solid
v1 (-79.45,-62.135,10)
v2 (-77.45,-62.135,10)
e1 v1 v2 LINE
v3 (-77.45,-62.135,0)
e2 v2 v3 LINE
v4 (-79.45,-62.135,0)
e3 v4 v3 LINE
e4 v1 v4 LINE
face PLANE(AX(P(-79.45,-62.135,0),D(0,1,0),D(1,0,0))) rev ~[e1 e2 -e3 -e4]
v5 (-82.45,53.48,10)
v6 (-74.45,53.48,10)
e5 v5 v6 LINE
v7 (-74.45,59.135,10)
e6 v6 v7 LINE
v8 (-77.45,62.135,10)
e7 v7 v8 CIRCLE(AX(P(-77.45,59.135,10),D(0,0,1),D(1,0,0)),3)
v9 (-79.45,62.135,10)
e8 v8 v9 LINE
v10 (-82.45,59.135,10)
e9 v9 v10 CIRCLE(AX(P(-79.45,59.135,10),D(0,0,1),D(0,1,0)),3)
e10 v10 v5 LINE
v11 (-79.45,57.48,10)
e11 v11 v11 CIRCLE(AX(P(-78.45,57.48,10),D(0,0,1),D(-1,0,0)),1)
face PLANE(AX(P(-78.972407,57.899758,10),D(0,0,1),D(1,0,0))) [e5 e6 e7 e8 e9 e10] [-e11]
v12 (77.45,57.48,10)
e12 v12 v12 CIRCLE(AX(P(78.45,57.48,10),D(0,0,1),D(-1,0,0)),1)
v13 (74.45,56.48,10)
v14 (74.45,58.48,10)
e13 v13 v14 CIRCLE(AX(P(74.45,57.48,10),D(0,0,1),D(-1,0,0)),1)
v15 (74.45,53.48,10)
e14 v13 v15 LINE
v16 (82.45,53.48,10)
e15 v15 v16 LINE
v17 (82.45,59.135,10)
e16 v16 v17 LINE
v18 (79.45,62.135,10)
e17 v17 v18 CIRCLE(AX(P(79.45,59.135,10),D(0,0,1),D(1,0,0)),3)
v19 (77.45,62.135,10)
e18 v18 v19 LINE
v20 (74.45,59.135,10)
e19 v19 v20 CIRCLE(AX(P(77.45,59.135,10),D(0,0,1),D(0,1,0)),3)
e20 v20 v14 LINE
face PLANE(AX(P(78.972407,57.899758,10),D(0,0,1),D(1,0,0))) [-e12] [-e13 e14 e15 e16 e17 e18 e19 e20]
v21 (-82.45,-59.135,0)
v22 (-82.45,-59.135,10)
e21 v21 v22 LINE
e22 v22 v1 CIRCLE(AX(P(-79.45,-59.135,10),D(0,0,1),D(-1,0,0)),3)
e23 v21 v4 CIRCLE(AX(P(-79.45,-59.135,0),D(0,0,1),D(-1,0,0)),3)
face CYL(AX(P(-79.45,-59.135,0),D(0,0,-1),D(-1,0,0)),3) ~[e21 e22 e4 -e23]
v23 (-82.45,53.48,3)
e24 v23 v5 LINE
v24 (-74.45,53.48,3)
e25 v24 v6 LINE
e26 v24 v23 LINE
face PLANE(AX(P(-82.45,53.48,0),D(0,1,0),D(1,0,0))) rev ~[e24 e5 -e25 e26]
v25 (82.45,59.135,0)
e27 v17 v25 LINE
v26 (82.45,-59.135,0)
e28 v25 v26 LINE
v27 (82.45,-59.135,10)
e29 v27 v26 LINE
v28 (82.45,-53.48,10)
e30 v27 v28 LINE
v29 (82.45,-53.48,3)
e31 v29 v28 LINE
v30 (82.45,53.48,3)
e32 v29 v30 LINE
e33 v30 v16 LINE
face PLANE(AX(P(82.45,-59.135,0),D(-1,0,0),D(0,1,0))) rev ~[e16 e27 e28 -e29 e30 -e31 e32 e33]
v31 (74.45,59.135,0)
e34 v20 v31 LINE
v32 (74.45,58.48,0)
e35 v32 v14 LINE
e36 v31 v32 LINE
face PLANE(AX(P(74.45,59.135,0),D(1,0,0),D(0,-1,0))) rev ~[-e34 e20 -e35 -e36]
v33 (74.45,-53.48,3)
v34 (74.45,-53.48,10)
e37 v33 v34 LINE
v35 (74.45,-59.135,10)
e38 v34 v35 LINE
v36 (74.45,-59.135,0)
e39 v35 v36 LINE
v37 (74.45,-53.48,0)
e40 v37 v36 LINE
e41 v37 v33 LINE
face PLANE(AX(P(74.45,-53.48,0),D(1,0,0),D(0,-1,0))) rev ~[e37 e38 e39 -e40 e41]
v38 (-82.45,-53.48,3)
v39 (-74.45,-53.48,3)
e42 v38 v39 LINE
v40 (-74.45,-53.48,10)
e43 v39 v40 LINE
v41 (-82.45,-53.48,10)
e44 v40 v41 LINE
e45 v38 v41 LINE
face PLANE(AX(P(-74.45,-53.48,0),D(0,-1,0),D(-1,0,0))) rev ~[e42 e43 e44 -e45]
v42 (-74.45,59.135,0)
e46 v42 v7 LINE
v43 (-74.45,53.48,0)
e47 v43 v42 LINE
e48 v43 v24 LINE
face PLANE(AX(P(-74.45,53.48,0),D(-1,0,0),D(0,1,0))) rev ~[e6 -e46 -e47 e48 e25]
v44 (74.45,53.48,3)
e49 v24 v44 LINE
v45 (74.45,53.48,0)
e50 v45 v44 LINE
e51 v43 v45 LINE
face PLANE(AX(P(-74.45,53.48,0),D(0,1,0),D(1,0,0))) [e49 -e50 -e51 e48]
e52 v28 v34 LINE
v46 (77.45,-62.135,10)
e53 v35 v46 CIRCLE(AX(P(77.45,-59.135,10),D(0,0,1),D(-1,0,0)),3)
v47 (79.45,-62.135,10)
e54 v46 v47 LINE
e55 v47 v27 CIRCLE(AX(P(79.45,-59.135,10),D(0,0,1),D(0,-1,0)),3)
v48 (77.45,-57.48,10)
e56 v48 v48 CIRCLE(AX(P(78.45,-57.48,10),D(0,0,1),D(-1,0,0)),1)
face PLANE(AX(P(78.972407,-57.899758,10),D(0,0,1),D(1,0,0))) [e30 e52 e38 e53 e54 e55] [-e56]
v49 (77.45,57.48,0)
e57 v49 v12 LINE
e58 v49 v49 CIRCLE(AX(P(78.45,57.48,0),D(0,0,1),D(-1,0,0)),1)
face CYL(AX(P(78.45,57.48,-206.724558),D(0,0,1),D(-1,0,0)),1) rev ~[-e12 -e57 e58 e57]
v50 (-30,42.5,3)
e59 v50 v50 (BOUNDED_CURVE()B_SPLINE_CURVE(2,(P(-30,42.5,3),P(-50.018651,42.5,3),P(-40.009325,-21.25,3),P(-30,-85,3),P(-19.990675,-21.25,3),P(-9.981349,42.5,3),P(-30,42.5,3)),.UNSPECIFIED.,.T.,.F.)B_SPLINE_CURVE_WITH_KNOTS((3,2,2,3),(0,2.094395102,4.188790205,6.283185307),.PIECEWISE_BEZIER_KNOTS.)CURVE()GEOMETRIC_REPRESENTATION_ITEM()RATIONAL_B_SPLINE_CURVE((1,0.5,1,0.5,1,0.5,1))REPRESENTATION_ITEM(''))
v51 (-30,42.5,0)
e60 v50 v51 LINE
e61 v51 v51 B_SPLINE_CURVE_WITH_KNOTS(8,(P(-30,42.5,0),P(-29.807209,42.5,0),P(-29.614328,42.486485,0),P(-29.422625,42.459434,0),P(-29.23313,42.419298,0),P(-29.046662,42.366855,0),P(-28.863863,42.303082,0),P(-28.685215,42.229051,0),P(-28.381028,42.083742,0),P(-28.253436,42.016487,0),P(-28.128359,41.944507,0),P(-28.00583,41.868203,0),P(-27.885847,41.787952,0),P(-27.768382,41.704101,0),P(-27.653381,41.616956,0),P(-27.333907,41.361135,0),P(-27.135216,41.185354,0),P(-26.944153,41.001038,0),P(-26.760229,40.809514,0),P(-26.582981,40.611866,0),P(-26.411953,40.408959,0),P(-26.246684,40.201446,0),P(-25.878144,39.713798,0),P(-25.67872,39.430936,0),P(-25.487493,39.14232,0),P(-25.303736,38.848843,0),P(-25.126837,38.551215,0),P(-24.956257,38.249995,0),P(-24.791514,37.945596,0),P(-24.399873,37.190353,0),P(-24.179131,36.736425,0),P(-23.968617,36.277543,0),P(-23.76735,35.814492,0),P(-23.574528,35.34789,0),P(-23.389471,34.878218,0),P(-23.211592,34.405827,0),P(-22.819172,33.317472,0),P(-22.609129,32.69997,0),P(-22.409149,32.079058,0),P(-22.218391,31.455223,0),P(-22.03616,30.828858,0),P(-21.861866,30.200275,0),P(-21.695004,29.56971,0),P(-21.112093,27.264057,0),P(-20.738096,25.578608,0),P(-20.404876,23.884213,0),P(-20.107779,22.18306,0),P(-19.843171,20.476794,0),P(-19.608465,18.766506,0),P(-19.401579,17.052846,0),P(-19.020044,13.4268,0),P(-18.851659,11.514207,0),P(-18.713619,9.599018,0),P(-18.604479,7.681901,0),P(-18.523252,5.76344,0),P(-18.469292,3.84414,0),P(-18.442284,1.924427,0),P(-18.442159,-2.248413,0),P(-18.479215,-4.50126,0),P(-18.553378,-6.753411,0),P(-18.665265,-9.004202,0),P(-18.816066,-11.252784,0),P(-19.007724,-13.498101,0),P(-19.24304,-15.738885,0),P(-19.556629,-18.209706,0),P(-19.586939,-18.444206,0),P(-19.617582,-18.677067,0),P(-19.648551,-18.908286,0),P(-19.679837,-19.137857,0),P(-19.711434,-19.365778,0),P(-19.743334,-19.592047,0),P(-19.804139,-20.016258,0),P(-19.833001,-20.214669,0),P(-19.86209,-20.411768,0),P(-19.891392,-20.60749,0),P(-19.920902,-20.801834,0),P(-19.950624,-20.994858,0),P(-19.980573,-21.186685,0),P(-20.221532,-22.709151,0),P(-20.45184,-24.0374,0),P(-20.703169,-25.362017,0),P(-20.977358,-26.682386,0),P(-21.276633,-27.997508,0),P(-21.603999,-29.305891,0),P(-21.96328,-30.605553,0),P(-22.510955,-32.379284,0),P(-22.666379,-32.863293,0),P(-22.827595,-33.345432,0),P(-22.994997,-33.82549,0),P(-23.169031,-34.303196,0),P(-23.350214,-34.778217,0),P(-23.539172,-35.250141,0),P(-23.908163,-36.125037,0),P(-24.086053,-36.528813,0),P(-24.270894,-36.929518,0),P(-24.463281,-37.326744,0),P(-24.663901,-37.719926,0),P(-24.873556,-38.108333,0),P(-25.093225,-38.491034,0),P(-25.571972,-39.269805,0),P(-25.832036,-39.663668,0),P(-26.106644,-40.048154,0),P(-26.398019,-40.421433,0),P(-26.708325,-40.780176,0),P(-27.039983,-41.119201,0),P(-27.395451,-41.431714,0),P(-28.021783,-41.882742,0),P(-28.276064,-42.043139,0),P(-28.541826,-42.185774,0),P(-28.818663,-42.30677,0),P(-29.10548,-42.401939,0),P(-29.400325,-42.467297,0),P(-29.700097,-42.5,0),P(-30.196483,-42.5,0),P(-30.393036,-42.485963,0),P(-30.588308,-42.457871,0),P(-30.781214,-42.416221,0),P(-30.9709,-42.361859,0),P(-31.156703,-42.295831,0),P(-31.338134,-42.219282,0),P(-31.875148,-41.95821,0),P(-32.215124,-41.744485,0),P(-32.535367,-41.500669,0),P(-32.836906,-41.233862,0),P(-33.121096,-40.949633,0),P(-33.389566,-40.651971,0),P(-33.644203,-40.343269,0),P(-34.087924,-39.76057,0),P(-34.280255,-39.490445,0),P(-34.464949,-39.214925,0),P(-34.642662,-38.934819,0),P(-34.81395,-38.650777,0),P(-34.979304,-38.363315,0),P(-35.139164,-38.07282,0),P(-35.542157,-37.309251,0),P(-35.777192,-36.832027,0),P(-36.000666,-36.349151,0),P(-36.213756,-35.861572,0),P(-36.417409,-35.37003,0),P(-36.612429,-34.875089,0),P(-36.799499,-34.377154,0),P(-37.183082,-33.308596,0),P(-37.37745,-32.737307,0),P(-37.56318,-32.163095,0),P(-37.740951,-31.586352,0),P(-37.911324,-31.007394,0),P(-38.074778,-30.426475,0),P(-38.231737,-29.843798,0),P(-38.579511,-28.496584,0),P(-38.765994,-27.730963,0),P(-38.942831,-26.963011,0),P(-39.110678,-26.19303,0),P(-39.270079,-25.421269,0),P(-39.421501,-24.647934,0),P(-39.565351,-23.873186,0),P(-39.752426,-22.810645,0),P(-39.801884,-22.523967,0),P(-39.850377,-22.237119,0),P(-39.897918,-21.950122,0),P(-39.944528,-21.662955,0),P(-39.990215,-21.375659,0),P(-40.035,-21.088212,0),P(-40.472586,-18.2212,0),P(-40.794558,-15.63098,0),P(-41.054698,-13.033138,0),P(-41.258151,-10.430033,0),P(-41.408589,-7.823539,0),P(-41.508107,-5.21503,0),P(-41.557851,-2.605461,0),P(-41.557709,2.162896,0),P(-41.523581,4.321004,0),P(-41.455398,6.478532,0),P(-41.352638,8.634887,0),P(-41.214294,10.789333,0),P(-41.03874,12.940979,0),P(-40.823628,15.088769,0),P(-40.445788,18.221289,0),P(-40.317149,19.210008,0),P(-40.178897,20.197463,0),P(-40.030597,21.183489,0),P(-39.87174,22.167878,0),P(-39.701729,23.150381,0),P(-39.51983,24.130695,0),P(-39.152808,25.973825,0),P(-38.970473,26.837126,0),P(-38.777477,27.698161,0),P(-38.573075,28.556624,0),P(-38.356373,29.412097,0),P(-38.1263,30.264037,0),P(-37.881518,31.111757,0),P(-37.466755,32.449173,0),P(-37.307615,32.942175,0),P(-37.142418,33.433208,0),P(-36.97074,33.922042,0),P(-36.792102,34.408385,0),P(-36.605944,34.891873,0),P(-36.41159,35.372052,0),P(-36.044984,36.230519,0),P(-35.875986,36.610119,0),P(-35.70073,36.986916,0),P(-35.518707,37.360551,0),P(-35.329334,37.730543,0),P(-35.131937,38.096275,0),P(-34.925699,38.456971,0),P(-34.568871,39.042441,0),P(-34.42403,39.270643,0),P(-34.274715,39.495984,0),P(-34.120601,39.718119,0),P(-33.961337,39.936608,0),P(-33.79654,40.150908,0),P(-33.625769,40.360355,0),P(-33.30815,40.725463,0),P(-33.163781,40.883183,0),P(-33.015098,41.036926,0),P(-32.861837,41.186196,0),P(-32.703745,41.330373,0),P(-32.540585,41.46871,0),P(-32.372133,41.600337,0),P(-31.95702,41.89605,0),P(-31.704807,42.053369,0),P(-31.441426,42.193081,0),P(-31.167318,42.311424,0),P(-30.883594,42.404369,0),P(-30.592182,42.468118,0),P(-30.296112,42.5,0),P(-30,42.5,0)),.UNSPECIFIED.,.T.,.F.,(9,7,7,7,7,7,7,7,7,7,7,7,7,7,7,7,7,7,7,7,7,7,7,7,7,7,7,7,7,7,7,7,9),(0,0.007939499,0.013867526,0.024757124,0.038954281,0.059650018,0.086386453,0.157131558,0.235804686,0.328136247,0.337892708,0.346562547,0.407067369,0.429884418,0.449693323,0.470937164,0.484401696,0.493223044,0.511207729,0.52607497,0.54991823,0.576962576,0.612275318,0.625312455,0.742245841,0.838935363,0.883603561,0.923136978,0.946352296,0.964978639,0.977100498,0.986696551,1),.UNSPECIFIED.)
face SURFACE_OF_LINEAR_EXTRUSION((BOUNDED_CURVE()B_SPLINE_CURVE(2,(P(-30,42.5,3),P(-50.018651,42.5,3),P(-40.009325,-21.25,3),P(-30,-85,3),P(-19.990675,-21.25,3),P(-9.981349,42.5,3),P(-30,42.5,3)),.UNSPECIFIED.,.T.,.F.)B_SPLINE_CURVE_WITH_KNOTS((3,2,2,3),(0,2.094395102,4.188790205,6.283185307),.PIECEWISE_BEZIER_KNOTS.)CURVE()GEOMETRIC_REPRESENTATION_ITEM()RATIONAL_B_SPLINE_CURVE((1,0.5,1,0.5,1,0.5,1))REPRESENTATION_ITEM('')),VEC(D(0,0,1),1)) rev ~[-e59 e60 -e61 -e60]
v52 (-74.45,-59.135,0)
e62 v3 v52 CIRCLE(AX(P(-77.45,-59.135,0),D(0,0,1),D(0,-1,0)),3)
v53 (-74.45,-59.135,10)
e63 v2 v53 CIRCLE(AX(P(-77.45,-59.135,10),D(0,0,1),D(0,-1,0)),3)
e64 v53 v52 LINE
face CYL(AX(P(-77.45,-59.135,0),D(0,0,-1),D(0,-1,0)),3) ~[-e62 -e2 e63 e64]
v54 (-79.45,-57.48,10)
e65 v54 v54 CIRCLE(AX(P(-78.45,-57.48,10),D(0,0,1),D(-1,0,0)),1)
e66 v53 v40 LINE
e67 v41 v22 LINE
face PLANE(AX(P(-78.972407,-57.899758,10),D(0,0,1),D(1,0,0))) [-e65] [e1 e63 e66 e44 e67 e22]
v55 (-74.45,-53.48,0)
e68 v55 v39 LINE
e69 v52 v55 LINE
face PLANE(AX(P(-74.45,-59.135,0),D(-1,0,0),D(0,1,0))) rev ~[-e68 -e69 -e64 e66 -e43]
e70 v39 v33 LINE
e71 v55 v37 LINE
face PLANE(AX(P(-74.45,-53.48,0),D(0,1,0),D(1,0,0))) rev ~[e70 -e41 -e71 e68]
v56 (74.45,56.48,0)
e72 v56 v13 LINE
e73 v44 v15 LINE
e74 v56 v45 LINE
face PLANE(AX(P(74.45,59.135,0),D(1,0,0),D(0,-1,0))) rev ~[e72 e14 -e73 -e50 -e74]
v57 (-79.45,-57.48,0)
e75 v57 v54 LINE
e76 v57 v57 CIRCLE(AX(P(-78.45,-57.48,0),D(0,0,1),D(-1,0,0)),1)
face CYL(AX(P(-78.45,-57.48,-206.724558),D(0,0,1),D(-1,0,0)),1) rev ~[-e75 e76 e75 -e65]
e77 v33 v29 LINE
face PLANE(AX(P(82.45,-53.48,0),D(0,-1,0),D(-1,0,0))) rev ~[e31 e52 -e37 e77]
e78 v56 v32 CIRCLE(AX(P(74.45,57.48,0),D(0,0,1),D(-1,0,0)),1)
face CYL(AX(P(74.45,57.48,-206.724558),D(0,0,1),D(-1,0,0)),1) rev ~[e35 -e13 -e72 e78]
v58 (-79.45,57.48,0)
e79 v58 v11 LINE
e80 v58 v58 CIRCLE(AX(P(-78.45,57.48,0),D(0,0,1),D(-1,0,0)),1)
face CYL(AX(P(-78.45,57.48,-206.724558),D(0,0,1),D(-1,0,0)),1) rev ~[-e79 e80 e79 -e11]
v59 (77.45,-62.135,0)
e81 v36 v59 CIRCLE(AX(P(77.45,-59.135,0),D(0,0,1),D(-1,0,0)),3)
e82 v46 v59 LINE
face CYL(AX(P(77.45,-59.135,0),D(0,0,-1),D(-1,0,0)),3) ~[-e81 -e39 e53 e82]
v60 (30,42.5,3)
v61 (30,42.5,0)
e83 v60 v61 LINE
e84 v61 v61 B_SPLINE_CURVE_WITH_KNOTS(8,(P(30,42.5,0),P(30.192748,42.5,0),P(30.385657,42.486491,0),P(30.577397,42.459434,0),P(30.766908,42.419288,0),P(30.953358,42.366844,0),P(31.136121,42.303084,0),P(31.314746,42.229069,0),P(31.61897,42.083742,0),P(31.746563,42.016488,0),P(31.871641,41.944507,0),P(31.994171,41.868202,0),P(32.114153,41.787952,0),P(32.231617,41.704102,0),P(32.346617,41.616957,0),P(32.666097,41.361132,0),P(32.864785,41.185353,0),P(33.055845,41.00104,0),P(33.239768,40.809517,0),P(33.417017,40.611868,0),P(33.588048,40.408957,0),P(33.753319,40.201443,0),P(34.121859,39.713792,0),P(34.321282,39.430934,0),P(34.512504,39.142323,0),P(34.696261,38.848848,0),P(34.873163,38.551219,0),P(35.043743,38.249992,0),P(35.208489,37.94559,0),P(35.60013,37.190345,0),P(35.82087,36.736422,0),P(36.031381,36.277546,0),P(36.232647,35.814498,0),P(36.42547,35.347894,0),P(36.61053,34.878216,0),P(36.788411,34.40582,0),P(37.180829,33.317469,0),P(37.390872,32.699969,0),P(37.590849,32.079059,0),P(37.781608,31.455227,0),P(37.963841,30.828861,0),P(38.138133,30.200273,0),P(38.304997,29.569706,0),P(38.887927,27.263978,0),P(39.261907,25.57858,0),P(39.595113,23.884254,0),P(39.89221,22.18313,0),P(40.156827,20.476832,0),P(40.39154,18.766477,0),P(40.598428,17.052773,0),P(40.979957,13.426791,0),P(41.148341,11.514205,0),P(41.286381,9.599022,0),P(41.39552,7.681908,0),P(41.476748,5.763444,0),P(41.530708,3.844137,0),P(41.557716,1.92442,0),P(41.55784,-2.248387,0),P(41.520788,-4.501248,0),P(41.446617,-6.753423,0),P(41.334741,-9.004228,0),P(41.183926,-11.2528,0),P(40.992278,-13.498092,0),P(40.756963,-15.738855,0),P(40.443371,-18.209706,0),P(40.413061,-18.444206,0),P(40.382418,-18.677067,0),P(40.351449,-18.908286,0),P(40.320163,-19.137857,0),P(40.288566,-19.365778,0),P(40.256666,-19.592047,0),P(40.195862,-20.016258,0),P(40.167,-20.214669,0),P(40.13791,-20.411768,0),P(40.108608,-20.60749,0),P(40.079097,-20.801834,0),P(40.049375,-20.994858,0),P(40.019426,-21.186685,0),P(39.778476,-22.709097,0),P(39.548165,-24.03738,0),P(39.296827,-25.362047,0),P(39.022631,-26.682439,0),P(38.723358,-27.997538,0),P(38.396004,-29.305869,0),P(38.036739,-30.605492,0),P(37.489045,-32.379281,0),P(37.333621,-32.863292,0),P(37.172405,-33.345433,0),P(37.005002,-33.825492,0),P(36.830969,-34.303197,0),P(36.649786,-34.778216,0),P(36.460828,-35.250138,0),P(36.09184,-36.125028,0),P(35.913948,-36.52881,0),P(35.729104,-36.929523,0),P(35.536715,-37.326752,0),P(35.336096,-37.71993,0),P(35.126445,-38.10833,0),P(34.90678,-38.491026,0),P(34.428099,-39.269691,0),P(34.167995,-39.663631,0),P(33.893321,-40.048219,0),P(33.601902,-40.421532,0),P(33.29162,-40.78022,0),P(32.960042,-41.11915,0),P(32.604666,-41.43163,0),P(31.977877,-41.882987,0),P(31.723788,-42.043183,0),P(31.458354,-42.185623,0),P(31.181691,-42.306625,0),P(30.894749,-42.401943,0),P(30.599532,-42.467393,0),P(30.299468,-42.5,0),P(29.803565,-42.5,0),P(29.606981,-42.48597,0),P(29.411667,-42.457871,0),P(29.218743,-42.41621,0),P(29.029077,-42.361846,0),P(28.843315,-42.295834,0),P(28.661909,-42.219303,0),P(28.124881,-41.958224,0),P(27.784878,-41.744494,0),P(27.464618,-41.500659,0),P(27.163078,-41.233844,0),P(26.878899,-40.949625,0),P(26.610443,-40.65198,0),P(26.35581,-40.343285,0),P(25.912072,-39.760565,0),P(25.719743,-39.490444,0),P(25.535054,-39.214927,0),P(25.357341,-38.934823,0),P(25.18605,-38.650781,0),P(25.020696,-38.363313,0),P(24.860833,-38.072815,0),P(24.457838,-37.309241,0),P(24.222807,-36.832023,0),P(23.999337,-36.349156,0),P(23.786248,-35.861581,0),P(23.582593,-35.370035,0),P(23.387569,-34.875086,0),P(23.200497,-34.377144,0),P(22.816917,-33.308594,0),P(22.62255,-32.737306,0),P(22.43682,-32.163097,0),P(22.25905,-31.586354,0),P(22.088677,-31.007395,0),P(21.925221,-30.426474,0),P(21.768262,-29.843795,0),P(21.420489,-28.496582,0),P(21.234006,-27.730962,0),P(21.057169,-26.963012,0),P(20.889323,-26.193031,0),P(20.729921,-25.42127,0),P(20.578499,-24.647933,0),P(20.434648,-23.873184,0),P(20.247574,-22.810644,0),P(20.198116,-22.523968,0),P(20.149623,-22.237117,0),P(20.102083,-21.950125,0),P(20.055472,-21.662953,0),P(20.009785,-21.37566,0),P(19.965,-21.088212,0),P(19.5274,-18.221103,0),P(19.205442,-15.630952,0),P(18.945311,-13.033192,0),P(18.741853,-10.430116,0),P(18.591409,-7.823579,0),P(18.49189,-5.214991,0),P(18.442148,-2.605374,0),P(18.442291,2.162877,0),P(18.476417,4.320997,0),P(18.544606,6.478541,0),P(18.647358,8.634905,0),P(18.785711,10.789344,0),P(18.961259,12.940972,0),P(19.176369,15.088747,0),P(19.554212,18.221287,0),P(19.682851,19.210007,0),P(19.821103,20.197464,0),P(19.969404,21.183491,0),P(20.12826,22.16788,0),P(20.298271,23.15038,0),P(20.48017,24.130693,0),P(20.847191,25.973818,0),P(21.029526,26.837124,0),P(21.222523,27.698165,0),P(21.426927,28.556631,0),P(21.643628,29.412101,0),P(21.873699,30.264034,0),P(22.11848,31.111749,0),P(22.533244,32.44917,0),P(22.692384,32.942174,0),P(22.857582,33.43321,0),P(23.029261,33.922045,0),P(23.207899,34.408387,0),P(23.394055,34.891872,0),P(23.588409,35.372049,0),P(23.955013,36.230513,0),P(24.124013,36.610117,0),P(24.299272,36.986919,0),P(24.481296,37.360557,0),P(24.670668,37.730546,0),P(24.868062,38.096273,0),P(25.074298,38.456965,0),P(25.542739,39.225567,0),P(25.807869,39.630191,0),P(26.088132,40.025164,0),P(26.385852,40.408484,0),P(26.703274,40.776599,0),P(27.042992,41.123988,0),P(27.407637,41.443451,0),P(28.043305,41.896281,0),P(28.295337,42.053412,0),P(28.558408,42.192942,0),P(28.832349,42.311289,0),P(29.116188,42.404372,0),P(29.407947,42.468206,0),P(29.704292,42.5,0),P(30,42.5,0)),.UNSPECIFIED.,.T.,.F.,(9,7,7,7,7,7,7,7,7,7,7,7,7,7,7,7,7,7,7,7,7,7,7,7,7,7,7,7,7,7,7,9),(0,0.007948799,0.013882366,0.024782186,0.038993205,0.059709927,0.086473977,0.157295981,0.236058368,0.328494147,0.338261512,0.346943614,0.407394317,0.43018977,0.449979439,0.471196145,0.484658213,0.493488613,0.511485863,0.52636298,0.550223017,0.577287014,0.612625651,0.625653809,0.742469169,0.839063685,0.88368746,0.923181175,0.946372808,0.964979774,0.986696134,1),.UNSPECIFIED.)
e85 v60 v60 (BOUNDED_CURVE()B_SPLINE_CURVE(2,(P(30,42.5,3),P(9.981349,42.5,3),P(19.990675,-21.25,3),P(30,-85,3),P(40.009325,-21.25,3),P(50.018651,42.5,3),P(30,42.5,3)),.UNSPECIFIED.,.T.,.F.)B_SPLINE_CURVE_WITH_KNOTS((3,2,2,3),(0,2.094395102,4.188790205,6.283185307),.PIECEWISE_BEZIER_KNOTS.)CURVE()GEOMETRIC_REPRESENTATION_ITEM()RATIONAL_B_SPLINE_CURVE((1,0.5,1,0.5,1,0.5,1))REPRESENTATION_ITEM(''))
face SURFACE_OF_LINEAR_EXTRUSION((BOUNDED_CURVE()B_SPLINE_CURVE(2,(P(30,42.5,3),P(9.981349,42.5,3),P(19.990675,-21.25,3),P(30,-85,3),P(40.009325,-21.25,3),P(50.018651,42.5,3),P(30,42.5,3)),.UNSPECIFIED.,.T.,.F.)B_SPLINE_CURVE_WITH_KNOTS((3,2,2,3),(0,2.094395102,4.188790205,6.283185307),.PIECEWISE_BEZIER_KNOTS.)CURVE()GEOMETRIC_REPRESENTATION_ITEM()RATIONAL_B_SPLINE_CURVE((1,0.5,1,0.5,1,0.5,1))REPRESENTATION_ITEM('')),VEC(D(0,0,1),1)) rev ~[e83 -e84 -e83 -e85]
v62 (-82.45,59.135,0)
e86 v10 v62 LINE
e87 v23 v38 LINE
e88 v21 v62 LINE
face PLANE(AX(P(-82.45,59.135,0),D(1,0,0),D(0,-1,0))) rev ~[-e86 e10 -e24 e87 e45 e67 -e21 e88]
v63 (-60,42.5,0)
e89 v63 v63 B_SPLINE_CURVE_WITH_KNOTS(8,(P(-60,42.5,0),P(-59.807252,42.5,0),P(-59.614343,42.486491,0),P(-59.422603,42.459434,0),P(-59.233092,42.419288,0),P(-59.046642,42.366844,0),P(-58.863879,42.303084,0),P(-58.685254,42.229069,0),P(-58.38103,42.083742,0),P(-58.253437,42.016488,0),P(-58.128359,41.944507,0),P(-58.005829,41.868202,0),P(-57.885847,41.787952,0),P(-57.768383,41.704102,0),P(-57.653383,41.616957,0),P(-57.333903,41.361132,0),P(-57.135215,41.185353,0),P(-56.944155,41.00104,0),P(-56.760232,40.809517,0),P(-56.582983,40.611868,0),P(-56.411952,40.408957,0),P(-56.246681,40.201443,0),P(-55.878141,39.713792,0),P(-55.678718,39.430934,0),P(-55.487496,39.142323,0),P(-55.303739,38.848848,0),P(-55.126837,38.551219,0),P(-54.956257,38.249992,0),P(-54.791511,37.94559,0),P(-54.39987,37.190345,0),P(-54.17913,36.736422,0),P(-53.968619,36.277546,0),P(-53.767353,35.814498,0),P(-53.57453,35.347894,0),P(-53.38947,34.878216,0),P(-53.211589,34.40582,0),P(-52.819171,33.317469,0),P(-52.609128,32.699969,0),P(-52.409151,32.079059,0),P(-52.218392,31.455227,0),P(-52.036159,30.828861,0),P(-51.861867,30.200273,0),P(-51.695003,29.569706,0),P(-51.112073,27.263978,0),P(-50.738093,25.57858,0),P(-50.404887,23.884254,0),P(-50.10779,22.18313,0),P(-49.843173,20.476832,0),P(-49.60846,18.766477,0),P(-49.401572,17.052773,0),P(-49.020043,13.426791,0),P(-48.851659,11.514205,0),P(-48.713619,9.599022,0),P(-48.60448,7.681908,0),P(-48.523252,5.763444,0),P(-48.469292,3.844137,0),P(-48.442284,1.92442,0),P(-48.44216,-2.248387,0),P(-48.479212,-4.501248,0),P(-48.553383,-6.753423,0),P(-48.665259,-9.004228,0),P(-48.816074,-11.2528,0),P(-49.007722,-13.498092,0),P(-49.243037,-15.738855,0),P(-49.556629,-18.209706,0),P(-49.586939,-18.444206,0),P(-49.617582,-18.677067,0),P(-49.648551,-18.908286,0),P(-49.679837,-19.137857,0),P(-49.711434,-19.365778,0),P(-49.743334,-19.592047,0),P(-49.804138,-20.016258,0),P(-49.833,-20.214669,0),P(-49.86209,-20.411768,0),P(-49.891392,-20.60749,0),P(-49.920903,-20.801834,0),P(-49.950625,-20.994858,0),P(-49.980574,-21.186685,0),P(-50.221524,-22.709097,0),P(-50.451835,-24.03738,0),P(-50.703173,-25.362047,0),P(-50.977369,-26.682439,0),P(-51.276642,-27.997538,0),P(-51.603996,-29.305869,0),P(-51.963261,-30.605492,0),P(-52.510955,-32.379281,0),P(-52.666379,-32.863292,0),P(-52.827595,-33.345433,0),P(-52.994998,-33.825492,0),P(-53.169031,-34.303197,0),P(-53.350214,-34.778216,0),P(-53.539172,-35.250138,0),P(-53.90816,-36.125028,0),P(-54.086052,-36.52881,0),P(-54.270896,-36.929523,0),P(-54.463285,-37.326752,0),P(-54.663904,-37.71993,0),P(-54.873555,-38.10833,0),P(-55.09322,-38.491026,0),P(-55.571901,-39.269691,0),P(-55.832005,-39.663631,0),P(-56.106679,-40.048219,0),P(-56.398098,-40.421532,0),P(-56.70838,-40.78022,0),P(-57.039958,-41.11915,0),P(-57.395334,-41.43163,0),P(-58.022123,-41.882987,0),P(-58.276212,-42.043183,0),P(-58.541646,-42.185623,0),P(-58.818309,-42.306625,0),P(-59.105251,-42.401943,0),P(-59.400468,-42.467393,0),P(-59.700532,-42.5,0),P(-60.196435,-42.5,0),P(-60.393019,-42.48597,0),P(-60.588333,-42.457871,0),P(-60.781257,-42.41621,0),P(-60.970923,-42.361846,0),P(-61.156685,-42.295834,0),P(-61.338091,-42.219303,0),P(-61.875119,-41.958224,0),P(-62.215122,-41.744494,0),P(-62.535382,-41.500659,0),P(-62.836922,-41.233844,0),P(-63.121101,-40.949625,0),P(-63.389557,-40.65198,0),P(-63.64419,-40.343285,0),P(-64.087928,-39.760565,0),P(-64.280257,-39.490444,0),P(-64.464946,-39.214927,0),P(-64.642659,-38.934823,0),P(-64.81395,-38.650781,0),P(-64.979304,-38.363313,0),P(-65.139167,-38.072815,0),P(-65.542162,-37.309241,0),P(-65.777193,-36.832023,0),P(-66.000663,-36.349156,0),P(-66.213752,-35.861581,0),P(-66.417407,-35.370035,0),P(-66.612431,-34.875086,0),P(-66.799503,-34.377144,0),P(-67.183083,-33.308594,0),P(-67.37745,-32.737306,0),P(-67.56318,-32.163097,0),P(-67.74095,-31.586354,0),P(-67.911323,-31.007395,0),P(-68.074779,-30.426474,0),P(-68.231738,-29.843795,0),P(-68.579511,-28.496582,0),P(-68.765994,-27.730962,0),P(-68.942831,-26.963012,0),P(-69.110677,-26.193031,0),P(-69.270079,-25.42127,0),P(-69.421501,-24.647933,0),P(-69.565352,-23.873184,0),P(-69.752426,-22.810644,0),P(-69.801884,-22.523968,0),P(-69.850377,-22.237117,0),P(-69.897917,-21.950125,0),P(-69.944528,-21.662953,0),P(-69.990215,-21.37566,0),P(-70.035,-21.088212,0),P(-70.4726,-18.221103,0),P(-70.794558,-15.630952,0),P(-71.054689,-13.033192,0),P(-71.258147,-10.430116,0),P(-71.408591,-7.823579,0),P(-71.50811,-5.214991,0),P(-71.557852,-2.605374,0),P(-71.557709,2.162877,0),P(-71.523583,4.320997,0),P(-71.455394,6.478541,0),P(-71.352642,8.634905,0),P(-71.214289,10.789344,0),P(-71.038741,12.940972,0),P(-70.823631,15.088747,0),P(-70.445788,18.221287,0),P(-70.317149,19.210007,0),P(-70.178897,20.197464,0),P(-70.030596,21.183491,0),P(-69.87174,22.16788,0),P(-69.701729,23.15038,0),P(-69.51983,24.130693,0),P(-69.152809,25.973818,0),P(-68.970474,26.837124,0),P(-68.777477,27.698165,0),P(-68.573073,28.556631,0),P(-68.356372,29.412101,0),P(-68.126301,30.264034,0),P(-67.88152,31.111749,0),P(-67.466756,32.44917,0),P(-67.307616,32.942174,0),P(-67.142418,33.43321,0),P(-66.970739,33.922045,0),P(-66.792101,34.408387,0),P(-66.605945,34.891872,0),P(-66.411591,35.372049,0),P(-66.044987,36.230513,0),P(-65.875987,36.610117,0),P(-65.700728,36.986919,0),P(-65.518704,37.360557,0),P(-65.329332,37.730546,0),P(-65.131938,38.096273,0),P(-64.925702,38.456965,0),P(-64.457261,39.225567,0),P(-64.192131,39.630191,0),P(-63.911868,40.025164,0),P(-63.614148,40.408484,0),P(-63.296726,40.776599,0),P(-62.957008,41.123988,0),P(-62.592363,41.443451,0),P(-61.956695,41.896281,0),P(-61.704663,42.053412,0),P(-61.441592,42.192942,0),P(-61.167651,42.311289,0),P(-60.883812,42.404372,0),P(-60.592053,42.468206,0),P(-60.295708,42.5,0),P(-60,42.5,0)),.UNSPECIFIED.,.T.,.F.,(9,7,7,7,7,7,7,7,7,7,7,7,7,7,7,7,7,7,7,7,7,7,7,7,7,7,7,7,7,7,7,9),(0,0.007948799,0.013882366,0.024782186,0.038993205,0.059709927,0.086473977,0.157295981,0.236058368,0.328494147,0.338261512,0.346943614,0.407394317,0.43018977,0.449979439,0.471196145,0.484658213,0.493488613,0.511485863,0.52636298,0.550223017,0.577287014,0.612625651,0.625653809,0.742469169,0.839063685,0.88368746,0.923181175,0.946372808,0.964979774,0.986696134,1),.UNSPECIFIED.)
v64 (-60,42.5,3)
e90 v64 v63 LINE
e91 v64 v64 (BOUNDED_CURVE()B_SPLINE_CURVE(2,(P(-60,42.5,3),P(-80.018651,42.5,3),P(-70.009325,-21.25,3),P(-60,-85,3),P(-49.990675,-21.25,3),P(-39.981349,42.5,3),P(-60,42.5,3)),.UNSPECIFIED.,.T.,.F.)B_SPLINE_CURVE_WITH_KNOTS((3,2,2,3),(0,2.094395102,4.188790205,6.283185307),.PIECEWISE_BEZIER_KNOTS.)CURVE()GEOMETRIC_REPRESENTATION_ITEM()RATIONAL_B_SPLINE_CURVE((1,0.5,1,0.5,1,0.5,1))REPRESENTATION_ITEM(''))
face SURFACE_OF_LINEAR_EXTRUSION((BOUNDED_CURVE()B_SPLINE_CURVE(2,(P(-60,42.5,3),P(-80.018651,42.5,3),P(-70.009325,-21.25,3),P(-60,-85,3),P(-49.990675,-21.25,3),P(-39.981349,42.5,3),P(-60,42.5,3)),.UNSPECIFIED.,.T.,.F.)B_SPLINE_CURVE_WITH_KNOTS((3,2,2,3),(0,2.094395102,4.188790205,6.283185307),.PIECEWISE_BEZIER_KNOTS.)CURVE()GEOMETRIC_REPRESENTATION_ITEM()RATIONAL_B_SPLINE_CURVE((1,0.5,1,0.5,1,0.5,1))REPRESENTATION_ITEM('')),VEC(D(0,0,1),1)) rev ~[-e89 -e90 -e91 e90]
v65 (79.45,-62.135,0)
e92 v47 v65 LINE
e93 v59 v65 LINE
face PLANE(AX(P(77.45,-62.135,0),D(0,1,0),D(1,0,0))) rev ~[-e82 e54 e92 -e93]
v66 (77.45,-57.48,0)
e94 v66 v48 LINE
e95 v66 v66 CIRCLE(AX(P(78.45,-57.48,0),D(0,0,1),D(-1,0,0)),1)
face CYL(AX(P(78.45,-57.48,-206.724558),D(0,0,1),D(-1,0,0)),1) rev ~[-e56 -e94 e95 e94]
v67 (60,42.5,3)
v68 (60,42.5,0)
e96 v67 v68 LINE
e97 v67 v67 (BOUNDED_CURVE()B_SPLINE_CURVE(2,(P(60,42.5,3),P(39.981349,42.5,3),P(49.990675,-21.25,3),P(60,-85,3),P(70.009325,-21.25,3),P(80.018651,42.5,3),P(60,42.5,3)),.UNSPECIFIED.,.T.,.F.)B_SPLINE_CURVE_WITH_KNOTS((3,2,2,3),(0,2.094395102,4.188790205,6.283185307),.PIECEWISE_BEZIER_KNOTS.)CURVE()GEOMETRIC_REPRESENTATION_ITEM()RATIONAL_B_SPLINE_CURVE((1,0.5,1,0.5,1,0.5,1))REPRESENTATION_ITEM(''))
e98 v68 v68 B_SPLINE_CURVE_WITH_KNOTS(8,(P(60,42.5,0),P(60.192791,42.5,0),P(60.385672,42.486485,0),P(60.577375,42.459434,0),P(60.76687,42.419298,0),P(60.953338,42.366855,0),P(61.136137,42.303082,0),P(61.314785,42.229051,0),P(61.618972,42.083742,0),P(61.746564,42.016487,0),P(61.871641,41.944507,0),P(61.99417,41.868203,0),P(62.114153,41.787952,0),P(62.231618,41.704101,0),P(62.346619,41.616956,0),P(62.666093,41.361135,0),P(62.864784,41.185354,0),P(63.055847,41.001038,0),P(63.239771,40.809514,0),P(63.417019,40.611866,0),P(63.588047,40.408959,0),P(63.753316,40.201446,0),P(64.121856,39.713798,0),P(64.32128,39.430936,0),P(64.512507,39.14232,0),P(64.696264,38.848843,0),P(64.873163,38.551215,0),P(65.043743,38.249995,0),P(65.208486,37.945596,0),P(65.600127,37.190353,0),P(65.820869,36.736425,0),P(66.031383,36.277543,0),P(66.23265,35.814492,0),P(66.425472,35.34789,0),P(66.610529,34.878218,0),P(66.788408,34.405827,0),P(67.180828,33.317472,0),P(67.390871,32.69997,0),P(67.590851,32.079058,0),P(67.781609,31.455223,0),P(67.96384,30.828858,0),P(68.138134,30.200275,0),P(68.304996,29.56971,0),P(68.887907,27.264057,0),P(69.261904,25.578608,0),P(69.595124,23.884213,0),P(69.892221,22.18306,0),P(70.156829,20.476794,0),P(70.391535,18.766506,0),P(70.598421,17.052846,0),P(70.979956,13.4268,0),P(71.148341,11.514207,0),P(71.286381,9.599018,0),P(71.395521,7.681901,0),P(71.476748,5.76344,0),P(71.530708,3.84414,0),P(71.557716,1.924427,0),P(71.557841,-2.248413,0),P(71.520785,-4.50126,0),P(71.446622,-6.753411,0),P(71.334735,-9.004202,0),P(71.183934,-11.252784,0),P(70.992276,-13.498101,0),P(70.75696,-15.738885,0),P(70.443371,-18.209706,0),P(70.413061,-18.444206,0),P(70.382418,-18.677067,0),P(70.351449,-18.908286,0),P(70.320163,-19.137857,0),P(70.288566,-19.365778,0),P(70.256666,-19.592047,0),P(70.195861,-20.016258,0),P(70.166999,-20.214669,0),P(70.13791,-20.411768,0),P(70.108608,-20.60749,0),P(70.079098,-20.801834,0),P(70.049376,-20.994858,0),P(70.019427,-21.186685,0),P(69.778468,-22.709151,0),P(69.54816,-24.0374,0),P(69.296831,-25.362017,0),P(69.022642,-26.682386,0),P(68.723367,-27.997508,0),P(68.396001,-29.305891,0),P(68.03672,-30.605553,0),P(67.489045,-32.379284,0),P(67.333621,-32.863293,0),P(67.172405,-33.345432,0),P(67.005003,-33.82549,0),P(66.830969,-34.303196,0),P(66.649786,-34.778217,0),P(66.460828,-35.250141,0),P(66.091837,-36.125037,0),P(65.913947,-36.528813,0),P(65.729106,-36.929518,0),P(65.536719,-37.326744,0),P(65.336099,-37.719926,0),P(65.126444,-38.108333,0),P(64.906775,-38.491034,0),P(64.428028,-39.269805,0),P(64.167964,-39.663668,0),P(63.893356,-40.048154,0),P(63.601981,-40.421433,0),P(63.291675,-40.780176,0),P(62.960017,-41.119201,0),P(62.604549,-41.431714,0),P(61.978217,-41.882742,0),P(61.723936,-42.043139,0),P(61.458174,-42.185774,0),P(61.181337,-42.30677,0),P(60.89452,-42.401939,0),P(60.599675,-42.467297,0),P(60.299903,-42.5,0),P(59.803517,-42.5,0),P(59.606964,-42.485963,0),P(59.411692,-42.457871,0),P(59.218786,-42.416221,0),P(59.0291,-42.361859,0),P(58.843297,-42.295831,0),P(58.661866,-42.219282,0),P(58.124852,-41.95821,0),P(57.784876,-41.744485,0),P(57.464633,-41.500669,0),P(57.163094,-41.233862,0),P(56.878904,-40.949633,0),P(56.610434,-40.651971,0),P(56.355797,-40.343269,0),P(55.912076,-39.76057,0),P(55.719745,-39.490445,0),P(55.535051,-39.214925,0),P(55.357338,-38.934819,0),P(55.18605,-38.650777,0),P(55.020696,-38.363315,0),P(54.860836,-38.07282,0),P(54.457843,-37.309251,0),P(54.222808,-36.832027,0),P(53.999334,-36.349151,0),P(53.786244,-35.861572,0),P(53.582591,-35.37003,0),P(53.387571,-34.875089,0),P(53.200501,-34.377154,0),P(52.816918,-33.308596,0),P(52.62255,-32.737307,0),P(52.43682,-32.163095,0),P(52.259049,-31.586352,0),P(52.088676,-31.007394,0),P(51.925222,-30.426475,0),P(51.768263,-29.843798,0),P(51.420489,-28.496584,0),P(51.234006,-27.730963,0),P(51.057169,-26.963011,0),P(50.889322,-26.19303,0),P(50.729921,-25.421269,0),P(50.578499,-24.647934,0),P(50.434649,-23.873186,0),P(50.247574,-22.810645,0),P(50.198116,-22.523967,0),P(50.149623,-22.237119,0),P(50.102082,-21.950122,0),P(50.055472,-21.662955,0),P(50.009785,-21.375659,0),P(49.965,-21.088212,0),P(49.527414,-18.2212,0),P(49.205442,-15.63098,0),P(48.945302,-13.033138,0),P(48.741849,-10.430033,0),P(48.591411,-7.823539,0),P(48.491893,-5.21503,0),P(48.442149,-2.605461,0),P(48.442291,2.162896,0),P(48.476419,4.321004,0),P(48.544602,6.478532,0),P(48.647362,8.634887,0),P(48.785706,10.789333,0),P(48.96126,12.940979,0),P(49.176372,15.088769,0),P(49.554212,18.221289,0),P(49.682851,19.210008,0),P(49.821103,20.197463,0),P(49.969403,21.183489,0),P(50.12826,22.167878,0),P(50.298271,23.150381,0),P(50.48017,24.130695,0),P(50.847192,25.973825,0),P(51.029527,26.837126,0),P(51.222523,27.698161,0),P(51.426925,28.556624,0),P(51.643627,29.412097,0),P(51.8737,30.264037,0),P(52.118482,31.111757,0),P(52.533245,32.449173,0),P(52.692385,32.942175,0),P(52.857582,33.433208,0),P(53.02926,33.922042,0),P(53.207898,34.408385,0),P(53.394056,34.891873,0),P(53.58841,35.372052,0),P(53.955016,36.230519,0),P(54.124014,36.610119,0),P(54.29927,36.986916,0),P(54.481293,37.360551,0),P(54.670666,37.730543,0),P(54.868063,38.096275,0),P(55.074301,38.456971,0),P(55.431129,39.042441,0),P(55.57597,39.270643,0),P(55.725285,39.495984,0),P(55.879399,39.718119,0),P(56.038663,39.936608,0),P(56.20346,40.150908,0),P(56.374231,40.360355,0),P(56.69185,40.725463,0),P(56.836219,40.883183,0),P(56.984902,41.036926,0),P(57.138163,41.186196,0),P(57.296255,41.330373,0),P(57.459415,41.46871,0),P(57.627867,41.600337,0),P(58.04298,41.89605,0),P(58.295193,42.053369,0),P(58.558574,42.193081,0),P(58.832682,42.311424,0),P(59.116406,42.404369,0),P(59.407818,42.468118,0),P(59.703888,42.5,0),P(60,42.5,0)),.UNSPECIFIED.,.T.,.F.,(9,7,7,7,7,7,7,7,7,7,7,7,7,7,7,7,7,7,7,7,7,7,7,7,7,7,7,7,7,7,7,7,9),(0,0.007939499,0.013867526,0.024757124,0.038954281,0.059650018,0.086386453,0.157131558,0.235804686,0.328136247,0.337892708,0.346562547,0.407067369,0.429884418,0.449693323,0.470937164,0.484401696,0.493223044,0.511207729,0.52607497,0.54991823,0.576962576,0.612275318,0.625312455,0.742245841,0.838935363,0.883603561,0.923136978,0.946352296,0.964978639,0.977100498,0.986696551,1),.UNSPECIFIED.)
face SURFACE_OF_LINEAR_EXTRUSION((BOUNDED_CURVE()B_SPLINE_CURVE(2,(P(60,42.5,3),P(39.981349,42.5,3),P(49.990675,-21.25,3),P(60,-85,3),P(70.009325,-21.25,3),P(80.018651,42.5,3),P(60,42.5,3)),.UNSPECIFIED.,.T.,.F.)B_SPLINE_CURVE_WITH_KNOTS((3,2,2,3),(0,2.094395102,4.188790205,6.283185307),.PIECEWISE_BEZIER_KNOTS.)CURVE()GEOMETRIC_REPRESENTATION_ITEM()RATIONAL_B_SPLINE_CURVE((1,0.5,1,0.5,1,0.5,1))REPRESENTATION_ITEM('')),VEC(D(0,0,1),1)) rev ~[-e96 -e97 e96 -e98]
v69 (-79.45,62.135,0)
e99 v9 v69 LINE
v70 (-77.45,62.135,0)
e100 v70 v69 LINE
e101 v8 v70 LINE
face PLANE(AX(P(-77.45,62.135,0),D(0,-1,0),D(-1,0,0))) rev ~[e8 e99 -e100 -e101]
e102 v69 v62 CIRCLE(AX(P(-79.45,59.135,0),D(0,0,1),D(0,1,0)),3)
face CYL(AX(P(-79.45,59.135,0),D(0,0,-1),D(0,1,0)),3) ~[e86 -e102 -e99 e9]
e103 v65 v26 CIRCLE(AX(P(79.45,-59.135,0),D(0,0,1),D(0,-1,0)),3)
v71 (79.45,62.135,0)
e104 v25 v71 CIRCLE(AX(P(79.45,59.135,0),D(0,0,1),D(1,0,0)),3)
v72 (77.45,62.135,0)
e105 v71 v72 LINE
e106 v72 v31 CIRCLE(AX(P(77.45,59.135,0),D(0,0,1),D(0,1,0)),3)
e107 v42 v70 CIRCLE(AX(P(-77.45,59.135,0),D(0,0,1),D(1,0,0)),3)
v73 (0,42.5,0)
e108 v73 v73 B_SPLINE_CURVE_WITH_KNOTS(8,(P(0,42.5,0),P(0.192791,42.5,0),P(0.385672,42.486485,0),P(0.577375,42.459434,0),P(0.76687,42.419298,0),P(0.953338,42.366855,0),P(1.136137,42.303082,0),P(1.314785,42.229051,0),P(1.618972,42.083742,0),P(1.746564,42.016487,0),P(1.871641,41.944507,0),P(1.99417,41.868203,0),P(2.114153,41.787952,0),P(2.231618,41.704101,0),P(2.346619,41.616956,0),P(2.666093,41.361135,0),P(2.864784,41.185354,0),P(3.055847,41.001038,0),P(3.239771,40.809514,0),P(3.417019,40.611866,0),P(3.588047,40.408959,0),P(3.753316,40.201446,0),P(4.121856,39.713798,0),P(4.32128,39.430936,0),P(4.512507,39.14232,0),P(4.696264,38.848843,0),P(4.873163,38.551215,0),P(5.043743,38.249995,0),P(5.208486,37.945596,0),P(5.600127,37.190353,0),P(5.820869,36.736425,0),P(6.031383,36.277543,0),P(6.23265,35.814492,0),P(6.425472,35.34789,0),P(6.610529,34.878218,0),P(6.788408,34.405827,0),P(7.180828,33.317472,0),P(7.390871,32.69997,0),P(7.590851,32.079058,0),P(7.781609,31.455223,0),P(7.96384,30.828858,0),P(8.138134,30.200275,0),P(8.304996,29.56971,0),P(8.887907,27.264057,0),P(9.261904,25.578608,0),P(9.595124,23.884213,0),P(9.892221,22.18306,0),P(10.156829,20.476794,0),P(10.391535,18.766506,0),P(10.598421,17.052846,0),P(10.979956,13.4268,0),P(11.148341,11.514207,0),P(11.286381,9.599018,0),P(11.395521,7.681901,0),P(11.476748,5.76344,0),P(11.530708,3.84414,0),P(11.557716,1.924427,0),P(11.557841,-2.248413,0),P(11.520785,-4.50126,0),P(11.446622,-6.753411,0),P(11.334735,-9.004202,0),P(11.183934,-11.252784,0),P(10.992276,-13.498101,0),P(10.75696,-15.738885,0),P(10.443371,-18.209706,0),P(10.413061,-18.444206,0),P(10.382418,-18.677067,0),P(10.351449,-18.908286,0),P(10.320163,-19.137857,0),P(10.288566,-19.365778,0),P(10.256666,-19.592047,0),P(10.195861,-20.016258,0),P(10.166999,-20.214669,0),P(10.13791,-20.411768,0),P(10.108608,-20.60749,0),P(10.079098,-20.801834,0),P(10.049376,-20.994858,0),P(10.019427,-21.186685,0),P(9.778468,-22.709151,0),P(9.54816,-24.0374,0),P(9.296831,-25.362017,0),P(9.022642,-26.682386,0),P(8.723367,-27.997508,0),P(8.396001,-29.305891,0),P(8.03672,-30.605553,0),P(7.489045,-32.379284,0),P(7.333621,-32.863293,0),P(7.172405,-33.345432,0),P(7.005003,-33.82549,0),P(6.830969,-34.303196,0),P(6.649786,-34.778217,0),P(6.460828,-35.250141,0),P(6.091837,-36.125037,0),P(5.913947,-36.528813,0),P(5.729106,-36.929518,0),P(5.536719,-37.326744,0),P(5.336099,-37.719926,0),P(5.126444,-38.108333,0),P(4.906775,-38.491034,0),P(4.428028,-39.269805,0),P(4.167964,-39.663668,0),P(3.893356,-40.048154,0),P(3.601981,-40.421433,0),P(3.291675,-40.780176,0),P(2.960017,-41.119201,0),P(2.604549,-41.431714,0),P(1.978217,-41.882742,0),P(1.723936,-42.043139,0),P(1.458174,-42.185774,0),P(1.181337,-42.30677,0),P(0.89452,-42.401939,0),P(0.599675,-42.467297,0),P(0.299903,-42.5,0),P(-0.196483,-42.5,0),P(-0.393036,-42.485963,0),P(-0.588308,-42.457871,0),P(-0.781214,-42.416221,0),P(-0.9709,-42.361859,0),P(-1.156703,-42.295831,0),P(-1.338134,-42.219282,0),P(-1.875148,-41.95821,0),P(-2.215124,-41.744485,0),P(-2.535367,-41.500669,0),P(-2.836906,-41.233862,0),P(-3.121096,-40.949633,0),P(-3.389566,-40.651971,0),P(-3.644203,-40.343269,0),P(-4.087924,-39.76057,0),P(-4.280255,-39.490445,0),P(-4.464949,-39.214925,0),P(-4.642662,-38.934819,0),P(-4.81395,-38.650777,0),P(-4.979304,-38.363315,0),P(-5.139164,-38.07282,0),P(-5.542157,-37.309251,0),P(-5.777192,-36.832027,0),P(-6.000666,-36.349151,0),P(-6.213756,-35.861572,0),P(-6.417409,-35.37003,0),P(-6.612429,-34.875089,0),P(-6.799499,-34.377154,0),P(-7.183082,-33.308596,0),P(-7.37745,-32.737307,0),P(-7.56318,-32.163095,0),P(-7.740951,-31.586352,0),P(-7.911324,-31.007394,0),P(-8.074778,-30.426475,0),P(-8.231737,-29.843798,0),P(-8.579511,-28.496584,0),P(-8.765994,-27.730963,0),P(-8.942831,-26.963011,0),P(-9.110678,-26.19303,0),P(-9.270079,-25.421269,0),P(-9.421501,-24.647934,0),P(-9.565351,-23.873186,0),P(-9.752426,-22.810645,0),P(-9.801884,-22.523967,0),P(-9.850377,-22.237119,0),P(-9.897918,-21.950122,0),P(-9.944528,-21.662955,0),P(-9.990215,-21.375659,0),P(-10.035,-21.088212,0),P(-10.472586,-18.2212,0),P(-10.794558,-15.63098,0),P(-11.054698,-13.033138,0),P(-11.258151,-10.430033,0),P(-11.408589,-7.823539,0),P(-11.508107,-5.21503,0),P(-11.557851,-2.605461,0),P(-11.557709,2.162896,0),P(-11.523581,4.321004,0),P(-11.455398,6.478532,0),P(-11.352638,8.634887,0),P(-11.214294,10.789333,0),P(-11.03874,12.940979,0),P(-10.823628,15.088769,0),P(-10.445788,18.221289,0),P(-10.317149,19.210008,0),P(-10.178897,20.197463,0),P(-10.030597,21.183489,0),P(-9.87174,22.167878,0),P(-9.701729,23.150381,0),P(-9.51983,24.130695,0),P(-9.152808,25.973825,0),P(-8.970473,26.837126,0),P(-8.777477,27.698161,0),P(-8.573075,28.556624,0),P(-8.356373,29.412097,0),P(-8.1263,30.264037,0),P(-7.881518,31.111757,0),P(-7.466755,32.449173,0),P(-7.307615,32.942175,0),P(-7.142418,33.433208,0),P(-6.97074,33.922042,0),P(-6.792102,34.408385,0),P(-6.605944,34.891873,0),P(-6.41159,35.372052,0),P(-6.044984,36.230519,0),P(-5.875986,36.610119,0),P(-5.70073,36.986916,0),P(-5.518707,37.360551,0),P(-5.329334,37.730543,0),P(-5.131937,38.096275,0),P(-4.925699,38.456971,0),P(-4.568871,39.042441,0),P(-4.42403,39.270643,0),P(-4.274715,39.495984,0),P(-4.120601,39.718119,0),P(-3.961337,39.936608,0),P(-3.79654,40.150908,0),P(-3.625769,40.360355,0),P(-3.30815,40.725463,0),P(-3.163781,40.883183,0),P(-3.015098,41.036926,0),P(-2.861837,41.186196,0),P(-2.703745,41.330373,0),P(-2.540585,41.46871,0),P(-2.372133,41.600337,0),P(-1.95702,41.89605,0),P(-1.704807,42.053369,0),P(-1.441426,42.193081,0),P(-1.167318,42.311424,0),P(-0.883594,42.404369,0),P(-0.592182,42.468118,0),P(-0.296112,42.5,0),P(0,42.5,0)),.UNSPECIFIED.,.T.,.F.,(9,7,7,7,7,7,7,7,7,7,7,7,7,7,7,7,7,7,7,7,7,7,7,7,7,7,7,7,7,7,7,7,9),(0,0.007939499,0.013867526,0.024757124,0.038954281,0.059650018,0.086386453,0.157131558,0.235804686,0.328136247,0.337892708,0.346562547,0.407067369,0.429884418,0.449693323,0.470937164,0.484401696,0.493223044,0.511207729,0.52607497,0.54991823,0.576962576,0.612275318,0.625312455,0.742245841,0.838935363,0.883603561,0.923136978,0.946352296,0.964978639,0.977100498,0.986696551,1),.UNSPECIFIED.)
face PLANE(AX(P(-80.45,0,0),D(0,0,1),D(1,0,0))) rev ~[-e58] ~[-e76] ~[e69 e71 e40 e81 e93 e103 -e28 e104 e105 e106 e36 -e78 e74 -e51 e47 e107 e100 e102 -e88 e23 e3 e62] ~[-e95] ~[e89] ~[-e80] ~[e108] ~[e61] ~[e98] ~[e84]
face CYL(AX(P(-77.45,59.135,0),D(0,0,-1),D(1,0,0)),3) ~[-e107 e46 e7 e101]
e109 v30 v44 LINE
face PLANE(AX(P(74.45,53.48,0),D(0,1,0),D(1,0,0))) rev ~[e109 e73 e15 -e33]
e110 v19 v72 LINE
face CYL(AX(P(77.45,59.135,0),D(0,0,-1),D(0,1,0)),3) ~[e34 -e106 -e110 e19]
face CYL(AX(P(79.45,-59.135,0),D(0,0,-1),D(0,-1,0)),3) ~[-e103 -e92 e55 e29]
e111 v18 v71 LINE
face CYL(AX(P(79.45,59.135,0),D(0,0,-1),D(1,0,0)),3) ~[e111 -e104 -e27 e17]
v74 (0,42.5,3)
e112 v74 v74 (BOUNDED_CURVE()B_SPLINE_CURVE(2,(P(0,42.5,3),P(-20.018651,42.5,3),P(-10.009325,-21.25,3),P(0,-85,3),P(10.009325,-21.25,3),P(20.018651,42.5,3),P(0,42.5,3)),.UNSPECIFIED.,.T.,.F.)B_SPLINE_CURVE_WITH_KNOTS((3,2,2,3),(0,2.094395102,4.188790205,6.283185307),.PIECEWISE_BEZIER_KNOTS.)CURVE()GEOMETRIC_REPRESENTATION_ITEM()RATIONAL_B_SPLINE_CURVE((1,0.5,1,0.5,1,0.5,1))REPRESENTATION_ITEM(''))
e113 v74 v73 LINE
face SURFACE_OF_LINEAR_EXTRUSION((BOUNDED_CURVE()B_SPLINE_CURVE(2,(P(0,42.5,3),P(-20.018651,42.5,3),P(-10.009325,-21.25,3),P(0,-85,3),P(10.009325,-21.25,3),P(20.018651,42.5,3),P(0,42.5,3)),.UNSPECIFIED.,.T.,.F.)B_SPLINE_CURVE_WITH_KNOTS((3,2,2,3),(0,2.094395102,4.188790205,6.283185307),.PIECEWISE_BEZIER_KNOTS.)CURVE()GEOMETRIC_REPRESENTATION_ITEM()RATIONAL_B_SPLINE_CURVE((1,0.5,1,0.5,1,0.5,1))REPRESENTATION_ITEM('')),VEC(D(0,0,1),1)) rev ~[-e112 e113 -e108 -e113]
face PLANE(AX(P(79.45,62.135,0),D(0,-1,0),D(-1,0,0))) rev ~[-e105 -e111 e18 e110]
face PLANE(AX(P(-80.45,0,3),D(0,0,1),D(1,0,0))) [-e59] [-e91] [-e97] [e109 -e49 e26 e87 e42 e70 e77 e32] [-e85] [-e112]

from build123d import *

# Parameters (mm, degrees)
F0_W     = 4
F0_H     = 106.96
F0_H_2   = 4
F0_W_2   = 148.9
F1_DEPTH = 3
F2_DEPTH = 10
F3_D     = 2
F5_DEPTH = 25


# Not quite as in the source:
# - a feature names something its author has since deleted; it is built from what else it names


with BuildPart() as f1:
    # F0 (on Top) → F1 (new body)
    with BuildSketch(Plane.XY):
        with Locations((-80.45, 0)):
            Rectangle(F0_W, F0_H)
        with Locations((-76.45, 55.48)):
            Rectangle(F0_W, F0_H_2)
        Rectangle(F0_W_2, F0_H)
        with Locations((-76.45, 0)):
            Rectangle(F0_W, F0_H)
        with BuildLine():
            ThreePointArc((82.45, 59.135), (81.5713203436, 61.2563203436), (79.45, 62.135))
            Line((79.45, 62.135), (77.45, 62.135))
            ThreePointArc((77.45, 62.135), (75.3286796564, 61.2563203436), (74.45, 59.135))
            Line((74.45, 59.135), (74.45, 57.48))
            Line((74.45, 57.48), (78.45, 57.48))
            Line((78.45, 57.48), (78.45, 53.48))
            Line((78.45, 53.48), (82.45, 53.48))
            Line((82.45, 53.48), (82.45, 59.135))
        make_face()
        with Locations((76.45, 55.48)):
            Rectangle(F0_W, F0_H_2)
        with Locations((76.45, 0)):
            Rectangle(F0_W, F0_H)
        with Locations((80.45, 0)):
            Rectangle(F0_W, F0_H)
        with Locations((76.45, -55.48)):
            Rectangle(F0_W, F0_H_2)
        with BuildLine():
            Line((82.45, -59.135), (82.45, -53.48))
            Line((82.45, -53.48), (78.45, -53.48))
            Line((78.45, -53.48), (78.45, -57.48))
            Line((78.45, -57.48), (74.45, -57.48))
            Line((74.45, -57.48), (74.45, -59.135))
            ThreePointArc((74.45, -59.135), (75.3286796564, -61.2563203436), (77.45, -62.135))
            Line((77.45, -62.135), (79.45, -62.135))
            ThreePointArc((79.45, -62.135), (81.5713203436, -61.2563203436), (82.45, -59.135))
        make_face()
        with BuildLine():
            Line((-78.45, -57.48), (-78.45, -53.48))
            Line((-78.45, -53.48), (-82.45, -53.48))
            Line((-82.45, -53.48), (-82.45, -59.135))
            ThreePointArc((-82.45, -59.135), (-81.5713203436, -61.2563203436), (-79.45, -62.135))
            Line((-79.45, -62.135), (-77.45, -62.135))
            ThreePointArc((-77.45, -62.135), (-75.3286796564, -61.2563203436), (-74.45, -59.135))
            Line((-74.45, -59.135), (-74.45, -57.48))
            Line((-74.45, -57.48), (-78.45, -57.48))
        make_face()
        with Locations((-76.45, -55.48)):
            Rectangle(F0_W, F0_H_2)
        with BuildLine():
            Line((-82.45, 53.48), (-78.45, 53.48))
            Line((-78.45, 53.48), (-78.45, 57.48))
            Line((-78.45, 57.48), (-74.45, 57.48))
            Line((-74.45, 57.48), (-74.45, 59.135))
            ThreePointArc((-74.45, 59.135), (-75.3286796564, 61.2563203436), (-77.45, 62.135))
            Line((-77.45, 62.135), (-79.45, 62.135))
            ThreePointArc((-79.45, 62.135), (-81.5713203436, 61.2563203436), (-82.45, 59.135))
            Line((-82.45, 59.135), (-82.45, 53.48))
        make_face()
    extrude(amount=F1_DEPTH)

    # F0 (on Top) → F2 (join)
    with BuildSketch(Plane.XY):
        with BuildLine():
            ThreePointArc((82.45, 59.135), (81.5713203436, 61.2563203436), (79.45, 62.135))
            Line((79.45, 62.135), (77.45, 62.135))
            ThreePointArc((77.45, 62.135), (75.3286796564, 61.2563203436), (74.45, 59.135))
            Line((74.45, 59.135), (74.45, 57.48))
            Line((74.45, 57.48), (78.45, 57.48))
            Line((78.45, 57.48), (78.45, 53.48))
            Line((78.45, 53.48), (82.45, 53.48))
            Line((82.45, 53.48), (82.45, 59.135))
        make_face()
        with Locations((76.45, 55.48)):
            Rectangle(F0_W, F0_H_2)
        with BuildLine():
            Line((-82.45, 53.48), (-78.45, 53.48))
            Line((-78.45, 53.48), (-78.45, 57.48))
            Line((-78.45, 57.48), (-74.45, 57.48))
            Line((-74.45, 57.48), (-74.45, 59.135))
            ThreePointArc((-74.45, 59.135), (-75.3286796564, 61.2563203436), (-77.45, 62.135))
            Line((-77.45, 62.135), (-79.45, 62.135))
            ThreePointArc((-79.45, 62.135), (-81.5713203436, 61.2563203436), (-82.45, 59.135))
            Line((-82.45, 59.135), (-82.45, 53.48))
        make_face()
        with Locations((-76.45, 55.48)):
            Rectangle(F0_W, F0_H_2)
        with BuildLine():
            Line((82.45, -59.135), (82.45, -53.48))
            Line((82.45, -53.48), (78.45, -53.48))
            Line((78.45, -53.48), (78.45, -57.48))
            Line((78.45, -57.48), (74.45, -57.48))
            Line((74.45, -57.48), (74.45, -59.135))
            ThreePointArc((74.45, -59.135), (75.3286796564, -61.2563203436), (77.45, -62.135))
            Line((77.45, -62.135), (79.45, -62.135))
            ThreePointArc((79.45, -62.135), (81.5713203436, -61.2563203436), (82.45, -59.135))
        make_face()
        with Locations((76.45, -55.48)):
            Rectangle(F0_W, F0_H_2)
        with BuildLine():
            Line((-78.45, -57.48), (-78.45, -53.48))
            Line((-78.45, -53.48), (-82.45, -53.48))
            Line((-82.45, -53.48), (-82.45, -59.135))
            ThreePointArc((-82.45, -59.135), (-81.5713203436, -61.2563203436), (-79.45, -62.135))
            Line((-79.45, -62.135), (-77.45, -62.135))
            ThreePointArc((-77.45, -62.135), (-75.3286796564, -61.2563203436), (-74.45, -59.135))
            Line((-74.45, -59.135), (-74.45, -57.48))
            Line((-74.45, -57.48), (-78.45, -57.48))
        make_face()
        with Locations((-76.45, -55.48)):
            Rectangle(F0_W, F0_H_2)
    extrude(amount=F2_DEPTH)

    # F3 (through all)
    with Locations(Plane(origin=(0, 0, 0), x_dir=(1, 0, 0), z_dir=(0, 0, -1))):
        with Locations((74.45, -57.48), (78.45, -57.48), (78.45, 57.48), (-78.45, 57.48), (-78.45, -57.48)):
            Hole(F3_D / 2)

    # F4 (on face) → F5 (cut)
    with BuildSketch(Plane.XY.offset(3)):
        with BuildLine():
            add(Edge.make_bspline(
                [(-60, 42.5), (-80.0186509611, 42.5), (-70.0093254806, -21.25), (-60, -85), (-49.9906745194, -21.25), (-39.9813490389, 42.5), (-60, 42.5)],
                knots=[0, 0, 0, 2.0943951024, 2.0943951024, 4.1887902048, 4.1887902048, 6.2831853072, 6.2831853072, 6.2831853072], degree=2, weights=[1, 0.5, 1, 0.5, 1, 0.5, 1]))
        make_face()
        with BuildLine():
            add(Edge.make_bspline(
                [(-30, 42.5), (-50.0186509611, 42.5), (-40.0093254806, -21.25), (-30, -85), (-19.9906745194, -21.25), (-9.9813490389, 42.5), (-30, 42.5)],
                knots=[0, 0, 0, 2.0943951024, 2.0943951024, 4.1887902048, 4.1887902048, 6.2831853072, 6.2831853072, 6.2831853072], degree=2, weights=[1, 0.5, 1, 0.5, 1, 0.5, 1]))
        make_face()
        with BuildLine():
            add(Edge.make_bspline(
                [(0, 42.5), (-20.0186509611, 42.5), (-10.0093254806, -21.25), (0, -85), (10.0093254806, -21.25), (20.0186509611, 42.5), (0, 42.5)],
                knots=[0, 0, 0, 2.0943951024, 2.0943951024, 4.1887902048, 4.1887902048, 6.2831853072, 6.2831853072, 6.2831853072], degree=2, weights=[1, 0.5, 1, 0.5, 1, 0.5, 1]))
        make_face()
        with BuildLine():
            add(Edge.make_bspline(
                [(30, 42.5), (9.9813490389, 42.5), (19.9906745194, -21.25), (30, -85), (40.0093254806, -21.25), (50.0186509611, 42.5), (30, 42.5)],
                knots=[0, 0, 0, 2.0943951024, 2.0943951024, 4.1887902048, 4.1887902048, 6.2831853072, 6.2831853072, 6.2831853072], degree=2, weights=[1, 0.5, 1, 0.5, 1, 0.5, 1]))
        make_face()
        with BuildLine():
            add(Edge.make_bspline(
                [(60, 42.5), (39.9813490389, 42.5), (49.9906745194, -21.25), (60, -85), (70.0093254806, -21.25), (80.0186509611, 42.5), (60, 42.5)],
                knots=[0, 0, 0, 2.0943951024, 2.0943951024, 4.1887902048, 4.1887902048, 6.2831853072, 6.2831853072, 6.2831853072], degree=2, weights=[1, 0.5, 1, 0.5, 1, 0.5, 1]))
        make_face()
    extrude(amount=-F5_DEPTH, mode=Mode.SUBTRACT)


solid = f1.part
